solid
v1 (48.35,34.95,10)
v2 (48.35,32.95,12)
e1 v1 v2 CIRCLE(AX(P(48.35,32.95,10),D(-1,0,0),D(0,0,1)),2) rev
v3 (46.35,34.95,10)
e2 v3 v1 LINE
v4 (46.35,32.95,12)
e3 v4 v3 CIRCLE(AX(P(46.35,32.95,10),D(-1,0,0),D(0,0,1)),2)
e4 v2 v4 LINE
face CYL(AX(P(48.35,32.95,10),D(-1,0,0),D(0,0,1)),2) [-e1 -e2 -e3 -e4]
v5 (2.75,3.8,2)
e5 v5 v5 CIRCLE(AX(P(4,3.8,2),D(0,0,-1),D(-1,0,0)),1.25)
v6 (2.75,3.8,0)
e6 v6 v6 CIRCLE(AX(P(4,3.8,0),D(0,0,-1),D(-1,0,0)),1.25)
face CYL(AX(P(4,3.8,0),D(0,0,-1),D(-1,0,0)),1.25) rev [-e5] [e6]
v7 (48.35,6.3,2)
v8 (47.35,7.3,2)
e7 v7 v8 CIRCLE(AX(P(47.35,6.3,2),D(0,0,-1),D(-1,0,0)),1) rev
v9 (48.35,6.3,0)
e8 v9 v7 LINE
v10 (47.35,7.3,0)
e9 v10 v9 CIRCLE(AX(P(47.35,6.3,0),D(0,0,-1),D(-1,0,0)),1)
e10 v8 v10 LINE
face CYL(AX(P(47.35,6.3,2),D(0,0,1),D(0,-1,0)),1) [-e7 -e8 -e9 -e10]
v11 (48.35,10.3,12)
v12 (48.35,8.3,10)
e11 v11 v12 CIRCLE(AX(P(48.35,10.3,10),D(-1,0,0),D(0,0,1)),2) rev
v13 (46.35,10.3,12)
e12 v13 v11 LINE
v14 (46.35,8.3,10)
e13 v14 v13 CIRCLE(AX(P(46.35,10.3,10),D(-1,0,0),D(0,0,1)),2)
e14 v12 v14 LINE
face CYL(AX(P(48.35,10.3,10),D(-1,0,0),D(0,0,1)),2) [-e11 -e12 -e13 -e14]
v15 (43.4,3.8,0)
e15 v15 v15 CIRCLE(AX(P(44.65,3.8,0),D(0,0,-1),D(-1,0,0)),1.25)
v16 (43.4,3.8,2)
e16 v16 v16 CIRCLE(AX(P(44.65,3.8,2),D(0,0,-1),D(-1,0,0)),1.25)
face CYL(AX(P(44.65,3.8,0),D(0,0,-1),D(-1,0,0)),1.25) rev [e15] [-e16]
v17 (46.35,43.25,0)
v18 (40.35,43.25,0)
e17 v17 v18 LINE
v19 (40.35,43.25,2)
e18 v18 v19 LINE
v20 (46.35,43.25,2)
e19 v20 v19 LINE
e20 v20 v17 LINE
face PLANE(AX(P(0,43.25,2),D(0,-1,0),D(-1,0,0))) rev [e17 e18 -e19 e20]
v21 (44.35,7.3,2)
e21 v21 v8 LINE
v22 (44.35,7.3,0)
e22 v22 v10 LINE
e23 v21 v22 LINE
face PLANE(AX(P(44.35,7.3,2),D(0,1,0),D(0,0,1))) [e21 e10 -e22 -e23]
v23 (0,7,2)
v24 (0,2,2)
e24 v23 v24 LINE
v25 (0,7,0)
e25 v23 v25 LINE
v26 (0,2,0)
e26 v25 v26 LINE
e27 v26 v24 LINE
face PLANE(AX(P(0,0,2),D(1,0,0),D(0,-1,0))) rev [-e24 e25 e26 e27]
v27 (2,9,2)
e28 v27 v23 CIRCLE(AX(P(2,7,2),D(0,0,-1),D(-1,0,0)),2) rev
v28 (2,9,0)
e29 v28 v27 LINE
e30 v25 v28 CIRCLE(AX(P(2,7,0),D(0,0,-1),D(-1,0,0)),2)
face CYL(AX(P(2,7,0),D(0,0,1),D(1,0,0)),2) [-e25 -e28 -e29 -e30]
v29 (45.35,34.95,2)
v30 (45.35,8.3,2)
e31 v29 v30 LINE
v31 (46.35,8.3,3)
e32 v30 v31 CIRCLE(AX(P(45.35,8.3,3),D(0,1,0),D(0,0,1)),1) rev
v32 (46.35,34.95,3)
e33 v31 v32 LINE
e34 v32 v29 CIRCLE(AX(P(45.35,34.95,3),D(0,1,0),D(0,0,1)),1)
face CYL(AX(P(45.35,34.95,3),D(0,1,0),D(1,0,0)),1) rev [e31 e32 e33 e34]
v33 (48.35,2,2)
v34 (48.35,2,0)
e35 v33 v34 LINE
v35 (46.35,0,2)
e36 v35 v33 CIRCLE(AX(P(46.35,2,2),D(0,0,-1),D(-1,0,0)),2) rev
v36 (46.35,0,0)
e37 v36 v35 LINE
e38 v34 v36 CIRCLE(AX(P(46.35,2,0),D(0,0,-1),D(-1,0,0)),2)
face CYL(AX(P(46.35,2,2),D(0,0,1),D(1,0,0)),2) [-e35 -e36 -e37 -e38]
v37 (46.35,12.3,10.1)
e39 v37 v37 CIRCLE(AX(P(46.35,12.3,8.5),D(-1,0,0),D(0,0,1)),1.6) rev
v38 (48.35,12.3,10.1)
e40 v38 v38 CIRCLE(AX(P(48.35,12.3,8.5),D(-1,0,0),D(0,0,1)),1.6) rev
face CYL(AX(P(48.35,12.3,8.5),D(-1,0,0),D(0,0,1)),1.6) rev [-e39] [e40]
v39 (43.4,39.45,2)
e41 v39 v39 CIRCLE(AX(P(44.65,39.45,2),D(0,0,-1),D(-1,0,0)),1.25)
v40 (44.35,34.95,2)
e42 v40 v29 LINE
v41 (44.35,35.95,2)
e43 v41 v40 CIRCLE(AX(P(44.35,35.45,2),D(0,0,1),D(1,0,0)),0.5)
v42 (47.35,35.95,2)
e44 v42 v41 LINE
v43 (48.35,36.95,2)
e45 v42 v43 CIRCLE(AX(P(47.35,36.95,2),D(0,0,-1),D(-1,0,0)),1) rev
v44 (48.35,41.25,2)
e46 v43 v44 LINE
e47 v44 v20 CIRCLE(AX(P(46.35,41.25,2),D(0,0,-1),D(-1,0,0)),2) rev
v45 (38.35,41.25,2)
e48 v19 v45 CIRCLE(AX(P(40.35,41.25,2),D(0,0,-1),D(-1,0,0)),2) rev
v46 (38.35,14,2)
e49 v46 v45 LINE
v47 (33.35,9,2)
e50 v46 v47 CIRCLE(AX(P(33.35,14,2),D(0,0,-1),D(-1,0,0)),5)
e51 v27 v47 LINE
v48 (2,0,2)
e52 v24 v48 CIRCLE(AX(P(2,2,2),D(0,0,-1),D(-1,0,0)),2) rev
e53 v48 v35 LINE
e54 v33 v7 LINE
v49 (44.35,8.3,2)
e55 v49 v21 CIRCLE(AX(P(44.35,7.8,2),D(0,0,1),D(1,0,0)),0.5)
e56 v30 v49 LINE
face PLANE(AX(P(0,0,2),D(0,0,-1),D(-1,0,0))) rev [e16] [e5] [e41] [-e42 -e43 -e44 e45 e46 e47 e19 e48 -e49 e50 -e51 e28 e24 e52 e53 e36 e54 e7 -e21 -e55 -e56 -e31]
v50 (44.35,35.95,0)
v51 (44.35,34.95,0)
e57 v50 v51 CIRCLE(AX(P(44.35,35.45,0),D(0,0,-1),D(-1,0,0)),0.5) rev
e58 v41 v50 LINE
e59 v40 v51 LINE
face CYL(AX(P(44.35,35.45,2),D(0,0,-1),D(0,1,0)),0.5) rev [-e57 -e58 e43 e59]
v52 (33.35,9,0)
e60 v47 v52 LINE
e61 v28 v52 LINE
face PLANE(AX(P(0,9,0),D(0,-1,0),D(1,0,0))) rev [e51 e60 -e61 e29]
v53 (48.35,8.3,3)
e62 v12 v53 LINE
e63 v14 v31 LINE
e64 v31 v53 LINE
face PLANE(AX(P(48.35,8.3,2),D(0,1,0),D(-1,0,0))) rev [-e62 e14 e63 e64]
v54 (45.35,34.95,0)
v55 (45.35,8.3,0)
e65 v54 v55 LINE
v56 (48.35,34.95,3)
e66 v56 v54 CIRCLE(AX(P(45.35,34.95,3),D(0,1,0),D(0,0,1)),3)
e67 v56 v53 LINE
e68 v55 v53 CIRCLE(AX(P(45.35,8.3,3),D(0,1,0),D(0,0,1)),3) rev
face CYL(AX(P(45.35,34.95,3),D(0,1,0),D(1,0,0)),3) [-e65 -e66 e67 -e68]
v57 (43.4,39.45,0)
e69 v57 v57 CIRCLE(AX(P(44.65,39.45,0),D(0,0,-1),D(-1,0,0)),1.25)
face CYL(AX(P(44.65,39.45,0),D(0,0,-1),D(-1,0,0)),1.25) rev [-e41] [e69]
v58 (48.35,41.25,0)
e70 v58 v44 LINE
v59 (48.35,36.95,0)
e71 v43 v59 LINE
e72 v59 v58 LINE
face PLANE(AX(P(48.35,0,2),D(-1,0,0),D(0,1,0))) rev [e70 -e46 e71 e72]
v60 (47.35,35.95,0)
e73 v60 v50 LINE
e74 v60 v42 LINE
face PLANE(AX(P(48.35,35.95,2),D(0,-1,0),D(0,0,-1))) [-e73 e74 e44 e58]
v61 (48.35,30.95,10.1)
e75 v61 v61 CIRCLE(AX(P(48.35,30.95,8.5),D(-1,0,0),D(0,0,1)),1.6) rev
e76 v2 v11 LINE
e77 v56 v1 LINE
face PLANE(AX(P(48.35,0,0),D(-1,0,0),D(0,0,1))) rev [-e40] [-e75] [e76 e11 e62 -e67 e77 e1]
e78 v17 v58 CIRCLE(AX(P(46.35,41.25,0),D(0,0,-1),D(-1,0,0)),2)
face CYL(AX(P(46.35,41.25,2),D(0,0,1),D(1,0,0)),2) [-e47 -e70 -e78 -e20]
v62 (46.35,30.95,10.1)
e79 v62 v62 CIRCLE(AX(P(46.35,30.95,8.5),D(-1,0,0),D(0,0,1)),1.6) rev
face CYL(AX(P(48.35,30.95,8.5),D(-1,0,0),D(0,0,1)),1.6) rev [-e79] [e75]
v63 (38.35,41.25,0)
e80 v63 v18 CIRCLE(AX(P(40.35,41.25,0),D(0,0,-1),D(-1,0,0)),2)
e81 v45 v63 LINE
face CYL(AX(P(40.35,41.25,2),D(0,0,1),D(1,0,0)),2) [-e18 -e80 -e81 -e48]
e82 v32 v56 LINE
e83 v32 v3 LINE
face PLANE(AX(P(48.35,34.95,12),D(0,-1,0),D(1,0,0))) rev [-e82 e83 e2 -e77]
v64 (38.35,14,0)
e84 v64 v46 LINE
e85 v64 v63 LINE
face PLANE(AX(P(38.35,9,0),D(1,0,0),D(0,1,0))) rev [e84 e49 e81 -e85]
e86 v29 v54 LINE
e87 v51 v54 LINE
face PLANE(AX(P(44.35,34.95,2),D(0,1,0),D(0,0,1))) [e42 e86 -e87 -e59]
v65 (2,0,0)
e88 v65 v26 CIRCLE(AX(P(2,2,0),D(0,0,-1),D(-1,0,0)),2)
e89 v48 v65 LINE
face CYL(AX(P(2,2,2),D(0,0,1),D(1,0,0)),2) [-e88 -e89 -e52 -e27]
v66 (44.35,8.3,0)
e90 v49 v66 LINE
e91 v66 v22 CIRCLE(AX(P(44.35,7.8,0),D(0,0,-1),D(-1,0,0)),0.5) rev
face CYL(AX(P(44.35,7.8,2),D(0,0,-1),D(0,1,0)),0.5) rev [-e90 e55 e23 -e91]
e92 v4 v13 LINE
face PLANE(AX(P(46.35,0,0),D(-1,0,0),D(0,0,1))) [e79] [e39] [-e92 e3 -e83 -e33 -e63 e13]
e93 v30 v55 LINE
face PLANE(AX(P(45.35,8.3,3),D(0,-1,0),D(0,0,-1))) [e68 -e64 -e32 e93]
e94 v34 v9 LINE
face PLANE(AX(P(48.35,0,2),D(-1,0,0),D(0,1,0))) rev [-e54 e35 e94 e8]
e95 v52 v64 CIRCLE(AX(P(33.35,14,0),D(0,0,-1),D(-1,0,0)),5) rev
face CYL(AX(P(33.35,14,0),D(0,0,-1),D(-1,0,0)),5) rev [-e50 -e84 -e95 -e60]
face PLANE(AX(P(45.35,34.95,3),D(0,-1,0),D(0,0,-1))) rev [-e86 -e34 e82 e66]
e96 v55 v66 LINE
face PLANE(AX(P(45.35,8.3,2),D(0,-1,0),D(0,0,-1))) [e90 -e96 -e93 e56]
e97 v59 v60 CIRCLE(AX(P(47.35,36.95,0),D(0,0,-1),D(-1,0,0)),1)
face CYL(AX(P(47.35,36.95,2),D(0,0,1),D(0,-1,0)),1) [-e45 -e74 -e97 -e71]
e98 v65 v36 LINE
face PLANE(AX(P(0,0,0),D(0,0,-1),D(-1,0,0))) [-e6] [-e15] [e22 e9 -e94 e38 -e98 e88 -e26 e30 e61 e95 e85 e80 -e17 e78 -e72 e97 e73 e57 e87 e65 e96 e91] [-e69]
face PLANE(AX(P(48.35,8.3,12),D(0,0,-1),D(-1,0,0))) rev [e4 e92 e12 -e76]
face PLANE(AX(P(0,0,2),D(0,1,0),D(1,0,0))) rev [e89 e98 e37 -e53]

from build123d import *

# Parameters (mm, degrees)
SKETCH1_W                 = 48.35
SKETCH1_H                 = 43.25
BOSS_EXTRUDE2_DEPTH       = 2
EDGE_FLANGE1_START        = -4
EDGE_FLANGE1_OUTLINE_W    = 1
EDGE_FLANGE1_OUTLINE_H    = 2
EDGE_FLANGE1_DEPTH        = 4
EDGE_FLANGE1_START_2      = -1
EDGE_FLANGE1_2_DEPTH      = 3.09178
EDGE_FLANGE1_START_3      = 2
EDGE_FLANGE1_3_OUTLINE_W  = 2
EDGE_FLANGE1_3_OUTLINE_H  = 26.65
EDGE_FLANGE1_3_DEPTH      = 10
EDGE_FLANGE1_START_4      = 8.3
EDGE_FLANGE1_4_DEPTH      = 26.65
EDGE_FLANGE1_5_DEPTH      = 26.65
EDGE_FLANGE1_START_5      = 46.35
EDGE_FLANGE1_6_OUTLINE_R  = 1.6
EDGE_FLANGE1_6_DEPTH      = 2
REDONDEO1_R               = 2
TALADRO_ROSCADO_M31_D     = 2.5
TALADRO_ROSCADO_M31_DEPTH = 8.5
TALADRO_ROSCADO_M31_TIP   = 0.751075774
CROQUIS4_W                = 38.35
CROQUIS4_H                = 34.25
CORTAR_EXTRUIR1_DEPTH     = 66.637527376
FILLET1_R                 = 2
REDONDEO2_R               = 5
REDONDEO3_R               = 1


with BuildPart() as part:
    # Sketch1 → Boss-Extrude2 (new body)
    with BuildSketch(Plane.XY):
        with Locations((24.175, 21.625)):
            Rectangle(SKETCH1_W, SKETCH1_H)
    extrude(amount=BOSS_EXTRUDE2_DEPTH)

    # Edge-Flange1: read off the stored shape, not the designer's step
    # Edge-Flange1 outline → Edge-Flange1 (cut)
    with BuildSketch(Plane(origin=(48.35, 0, 2), x_dir=(0, 1, 0), z_dir=(1, 0, 0)).offset(EDGE_FLANGE1_START)):
        with Locations((35.45, -1)):
            Rectangle(EDGE_FLANGE1_OUTLINE_W, EDGE_FLANGE1_OUTLINE_H)
        with Locations((7.8, -1)):
            Rectangle(EDGE_FLANGE1_OUTLINE_W, EDGE_FLANGE1_OUTLINE_H)
    extrude(amount=EDGE_FLANGE1_DEPTH, mode=Mode.SUBTRACT)

    # Edge-Flange1 2 outline → Edge-Flange1 2 (cut)
    with BuildSketch(Plane.XY.offset(EDGE_FLANGE1_START_2)):
        with BuildLine():
            Line((44.35, 7.3), (44.35, 8.3))
            ThreePointArc((44.35, 8.3), (43.85, 7.8), (44.35, 7.3))
        make_face()
        with BuildLine():
            ThreePointArc((44.35, 35.95), (43.85, 35.45), (44.35, 34.95))
            Line((44.35, 34.95), (44.35, 35.95))
        make_face()
    extrude(amount=EDGE_FLANGE1_2_DEPTH, mode=Mode.SUBTRACT)

    # Edge-Flange1 3 outline → Edge-Flange1 3 (add)
    with BuildSketch(Plane.XY.offset(EDGE_FLANGE1_START_3)):
        with Locations((47.35, 21.625)):
            Rectangle(EDGE_FLANGE1_3_OUTLINE_W, EDGE_FLANGE1_3_OUTLINE_H)
    extrude(amount=EDGE_FLANGE1_3_DEPTH)

    # Edge-Flange1 4 outline → Edge-Flange1 4 (add)
    with BuildSketch(Plane(origin=(0, 0, 0), x_dir=(1, 0, 0), z_dir=(0, 1, 0)).offset(EDGE_FLANGE1_START_4)):
        with BuildLine():
            Line((46.35, -3), (46.35, -2))
            Line((46.35, -2), (45.35, -2))
            ThreePointArc((45.35, -2), (46.057106781, -2.292893219), (46.35, -3))
        make_face()
    extrude(amount=EDGE_FLANGE1_4_DEPTH)

    # Edge-Flange1 5 outline → Edge-Flange1 5 (cut)
    with BuildSketch(Plane(origin=(0, 0, 0), x_dir=(1, 0, 0), z_dir=(0, 1, 0)).offset(EDGE_FLANGE1_START_4)):
        with BuildLine():
            Line((48.35, -3), (48.35, 0))
            Line((48.35, 0), (45.35, 0))
            ThreePointArc((45.35, 0), (47.471320344, -0.878679656), (48.35, -3))
        make_face()
    extrude(amount=EDGE_FLANGE1_5_DEPTH, mode=Mode.SUBTRACT)

    # Edge-Flange1 6 outline → Edge-Flange1 6 (cut)
    with BuildSketch(Plane.YZ.offset(EDGE_FLANGE1_START_5)):
        with Locations((12.3, 8.5)):
            Circle(EDGE_FLANGE1_6_OUTLINE_R)
        with Locations((30.95, 8.5)):
            Circle(EDGE_FLANGE1_6_OUTLINE_R)
    extrude(amount=EDGE_FLANGE1_6_DEPTH, mode=Mode.SUBTRACT)

    # Redondeo1
    redondeo1_edges = [part.edges().sort_by_distance(p)[0] for p in [
        (47.35, 8.3, 12),
        (47.35, 34.95, 12),
    ]]
    fillet(redondeo1_edges, radius=REDONDEO1_R)

    # Taladro roscado M31
    with Locations(Plane(origin=(0, 0, 0), x_dir=(-1, 0, 0), z_dir=(0, 0, -1))):
        with Locations((-44.65, 39.45), (-4, 3.8), (-44.65, 3.8)):
            Hole(TALADRO_ROSCADO_M31_D / 2, depth=TALADRO_ROSCADO_M31_DEPTH)
            with Locations((0, 0, -(TALADRO_ROSCADO_M31_DEPTH + TALADRO_ROSCADO_M31_TIP / 2))):  # 118° drill point
                Cone(0, TALADRO_ROSCADO_M31_D / 2, TALADRO_ROSCADO_M31_TIP, mode=Mode.SUBTRACT)

    # Croquis4 → Cortar-Extruir1 (cut, through all)
    with BuildSketch(Plane.XY.offset(2)):
        with Locations((19.175, 26.125)):
            Rectangle(CROQUIS4_W, CROQUIS4_H)
    extrude(amount=-CORTAR_EXTRUIR1_DEPTH, mode=Mode.SUBTRACT)

    # Fillet1
    fillet1_edges = [part.edges().sort_by_distance(p)[0] for p in [
        (0, 9, 1),
        (38.35, 43.25, 1),
        (0, 0, 1),
        (48.35, 43.25, 1),
        (48.35, 0, 1),
    ]]
    fillet(fillet1_edges, radius=FILLET1_R)

    # Redondeo2
    redondeo2_edges = [part.edges().sort_by_distance(p)[0] for p in [
        (38.35, 9, 1),
    ]]
    fillet(redondeo2_edges, radius=REDONDEO2_R)

    # Redondeo3
    redondeo3_edges = [part.edges().sort_by_distance(p)[0] for p in [
        (48.35, 35.95, 1),
        (48.35, 7.3, 1),
    ]]
    fillet(redondeo3_edges, radius=REDONDEO3_R)


solid = part.part
